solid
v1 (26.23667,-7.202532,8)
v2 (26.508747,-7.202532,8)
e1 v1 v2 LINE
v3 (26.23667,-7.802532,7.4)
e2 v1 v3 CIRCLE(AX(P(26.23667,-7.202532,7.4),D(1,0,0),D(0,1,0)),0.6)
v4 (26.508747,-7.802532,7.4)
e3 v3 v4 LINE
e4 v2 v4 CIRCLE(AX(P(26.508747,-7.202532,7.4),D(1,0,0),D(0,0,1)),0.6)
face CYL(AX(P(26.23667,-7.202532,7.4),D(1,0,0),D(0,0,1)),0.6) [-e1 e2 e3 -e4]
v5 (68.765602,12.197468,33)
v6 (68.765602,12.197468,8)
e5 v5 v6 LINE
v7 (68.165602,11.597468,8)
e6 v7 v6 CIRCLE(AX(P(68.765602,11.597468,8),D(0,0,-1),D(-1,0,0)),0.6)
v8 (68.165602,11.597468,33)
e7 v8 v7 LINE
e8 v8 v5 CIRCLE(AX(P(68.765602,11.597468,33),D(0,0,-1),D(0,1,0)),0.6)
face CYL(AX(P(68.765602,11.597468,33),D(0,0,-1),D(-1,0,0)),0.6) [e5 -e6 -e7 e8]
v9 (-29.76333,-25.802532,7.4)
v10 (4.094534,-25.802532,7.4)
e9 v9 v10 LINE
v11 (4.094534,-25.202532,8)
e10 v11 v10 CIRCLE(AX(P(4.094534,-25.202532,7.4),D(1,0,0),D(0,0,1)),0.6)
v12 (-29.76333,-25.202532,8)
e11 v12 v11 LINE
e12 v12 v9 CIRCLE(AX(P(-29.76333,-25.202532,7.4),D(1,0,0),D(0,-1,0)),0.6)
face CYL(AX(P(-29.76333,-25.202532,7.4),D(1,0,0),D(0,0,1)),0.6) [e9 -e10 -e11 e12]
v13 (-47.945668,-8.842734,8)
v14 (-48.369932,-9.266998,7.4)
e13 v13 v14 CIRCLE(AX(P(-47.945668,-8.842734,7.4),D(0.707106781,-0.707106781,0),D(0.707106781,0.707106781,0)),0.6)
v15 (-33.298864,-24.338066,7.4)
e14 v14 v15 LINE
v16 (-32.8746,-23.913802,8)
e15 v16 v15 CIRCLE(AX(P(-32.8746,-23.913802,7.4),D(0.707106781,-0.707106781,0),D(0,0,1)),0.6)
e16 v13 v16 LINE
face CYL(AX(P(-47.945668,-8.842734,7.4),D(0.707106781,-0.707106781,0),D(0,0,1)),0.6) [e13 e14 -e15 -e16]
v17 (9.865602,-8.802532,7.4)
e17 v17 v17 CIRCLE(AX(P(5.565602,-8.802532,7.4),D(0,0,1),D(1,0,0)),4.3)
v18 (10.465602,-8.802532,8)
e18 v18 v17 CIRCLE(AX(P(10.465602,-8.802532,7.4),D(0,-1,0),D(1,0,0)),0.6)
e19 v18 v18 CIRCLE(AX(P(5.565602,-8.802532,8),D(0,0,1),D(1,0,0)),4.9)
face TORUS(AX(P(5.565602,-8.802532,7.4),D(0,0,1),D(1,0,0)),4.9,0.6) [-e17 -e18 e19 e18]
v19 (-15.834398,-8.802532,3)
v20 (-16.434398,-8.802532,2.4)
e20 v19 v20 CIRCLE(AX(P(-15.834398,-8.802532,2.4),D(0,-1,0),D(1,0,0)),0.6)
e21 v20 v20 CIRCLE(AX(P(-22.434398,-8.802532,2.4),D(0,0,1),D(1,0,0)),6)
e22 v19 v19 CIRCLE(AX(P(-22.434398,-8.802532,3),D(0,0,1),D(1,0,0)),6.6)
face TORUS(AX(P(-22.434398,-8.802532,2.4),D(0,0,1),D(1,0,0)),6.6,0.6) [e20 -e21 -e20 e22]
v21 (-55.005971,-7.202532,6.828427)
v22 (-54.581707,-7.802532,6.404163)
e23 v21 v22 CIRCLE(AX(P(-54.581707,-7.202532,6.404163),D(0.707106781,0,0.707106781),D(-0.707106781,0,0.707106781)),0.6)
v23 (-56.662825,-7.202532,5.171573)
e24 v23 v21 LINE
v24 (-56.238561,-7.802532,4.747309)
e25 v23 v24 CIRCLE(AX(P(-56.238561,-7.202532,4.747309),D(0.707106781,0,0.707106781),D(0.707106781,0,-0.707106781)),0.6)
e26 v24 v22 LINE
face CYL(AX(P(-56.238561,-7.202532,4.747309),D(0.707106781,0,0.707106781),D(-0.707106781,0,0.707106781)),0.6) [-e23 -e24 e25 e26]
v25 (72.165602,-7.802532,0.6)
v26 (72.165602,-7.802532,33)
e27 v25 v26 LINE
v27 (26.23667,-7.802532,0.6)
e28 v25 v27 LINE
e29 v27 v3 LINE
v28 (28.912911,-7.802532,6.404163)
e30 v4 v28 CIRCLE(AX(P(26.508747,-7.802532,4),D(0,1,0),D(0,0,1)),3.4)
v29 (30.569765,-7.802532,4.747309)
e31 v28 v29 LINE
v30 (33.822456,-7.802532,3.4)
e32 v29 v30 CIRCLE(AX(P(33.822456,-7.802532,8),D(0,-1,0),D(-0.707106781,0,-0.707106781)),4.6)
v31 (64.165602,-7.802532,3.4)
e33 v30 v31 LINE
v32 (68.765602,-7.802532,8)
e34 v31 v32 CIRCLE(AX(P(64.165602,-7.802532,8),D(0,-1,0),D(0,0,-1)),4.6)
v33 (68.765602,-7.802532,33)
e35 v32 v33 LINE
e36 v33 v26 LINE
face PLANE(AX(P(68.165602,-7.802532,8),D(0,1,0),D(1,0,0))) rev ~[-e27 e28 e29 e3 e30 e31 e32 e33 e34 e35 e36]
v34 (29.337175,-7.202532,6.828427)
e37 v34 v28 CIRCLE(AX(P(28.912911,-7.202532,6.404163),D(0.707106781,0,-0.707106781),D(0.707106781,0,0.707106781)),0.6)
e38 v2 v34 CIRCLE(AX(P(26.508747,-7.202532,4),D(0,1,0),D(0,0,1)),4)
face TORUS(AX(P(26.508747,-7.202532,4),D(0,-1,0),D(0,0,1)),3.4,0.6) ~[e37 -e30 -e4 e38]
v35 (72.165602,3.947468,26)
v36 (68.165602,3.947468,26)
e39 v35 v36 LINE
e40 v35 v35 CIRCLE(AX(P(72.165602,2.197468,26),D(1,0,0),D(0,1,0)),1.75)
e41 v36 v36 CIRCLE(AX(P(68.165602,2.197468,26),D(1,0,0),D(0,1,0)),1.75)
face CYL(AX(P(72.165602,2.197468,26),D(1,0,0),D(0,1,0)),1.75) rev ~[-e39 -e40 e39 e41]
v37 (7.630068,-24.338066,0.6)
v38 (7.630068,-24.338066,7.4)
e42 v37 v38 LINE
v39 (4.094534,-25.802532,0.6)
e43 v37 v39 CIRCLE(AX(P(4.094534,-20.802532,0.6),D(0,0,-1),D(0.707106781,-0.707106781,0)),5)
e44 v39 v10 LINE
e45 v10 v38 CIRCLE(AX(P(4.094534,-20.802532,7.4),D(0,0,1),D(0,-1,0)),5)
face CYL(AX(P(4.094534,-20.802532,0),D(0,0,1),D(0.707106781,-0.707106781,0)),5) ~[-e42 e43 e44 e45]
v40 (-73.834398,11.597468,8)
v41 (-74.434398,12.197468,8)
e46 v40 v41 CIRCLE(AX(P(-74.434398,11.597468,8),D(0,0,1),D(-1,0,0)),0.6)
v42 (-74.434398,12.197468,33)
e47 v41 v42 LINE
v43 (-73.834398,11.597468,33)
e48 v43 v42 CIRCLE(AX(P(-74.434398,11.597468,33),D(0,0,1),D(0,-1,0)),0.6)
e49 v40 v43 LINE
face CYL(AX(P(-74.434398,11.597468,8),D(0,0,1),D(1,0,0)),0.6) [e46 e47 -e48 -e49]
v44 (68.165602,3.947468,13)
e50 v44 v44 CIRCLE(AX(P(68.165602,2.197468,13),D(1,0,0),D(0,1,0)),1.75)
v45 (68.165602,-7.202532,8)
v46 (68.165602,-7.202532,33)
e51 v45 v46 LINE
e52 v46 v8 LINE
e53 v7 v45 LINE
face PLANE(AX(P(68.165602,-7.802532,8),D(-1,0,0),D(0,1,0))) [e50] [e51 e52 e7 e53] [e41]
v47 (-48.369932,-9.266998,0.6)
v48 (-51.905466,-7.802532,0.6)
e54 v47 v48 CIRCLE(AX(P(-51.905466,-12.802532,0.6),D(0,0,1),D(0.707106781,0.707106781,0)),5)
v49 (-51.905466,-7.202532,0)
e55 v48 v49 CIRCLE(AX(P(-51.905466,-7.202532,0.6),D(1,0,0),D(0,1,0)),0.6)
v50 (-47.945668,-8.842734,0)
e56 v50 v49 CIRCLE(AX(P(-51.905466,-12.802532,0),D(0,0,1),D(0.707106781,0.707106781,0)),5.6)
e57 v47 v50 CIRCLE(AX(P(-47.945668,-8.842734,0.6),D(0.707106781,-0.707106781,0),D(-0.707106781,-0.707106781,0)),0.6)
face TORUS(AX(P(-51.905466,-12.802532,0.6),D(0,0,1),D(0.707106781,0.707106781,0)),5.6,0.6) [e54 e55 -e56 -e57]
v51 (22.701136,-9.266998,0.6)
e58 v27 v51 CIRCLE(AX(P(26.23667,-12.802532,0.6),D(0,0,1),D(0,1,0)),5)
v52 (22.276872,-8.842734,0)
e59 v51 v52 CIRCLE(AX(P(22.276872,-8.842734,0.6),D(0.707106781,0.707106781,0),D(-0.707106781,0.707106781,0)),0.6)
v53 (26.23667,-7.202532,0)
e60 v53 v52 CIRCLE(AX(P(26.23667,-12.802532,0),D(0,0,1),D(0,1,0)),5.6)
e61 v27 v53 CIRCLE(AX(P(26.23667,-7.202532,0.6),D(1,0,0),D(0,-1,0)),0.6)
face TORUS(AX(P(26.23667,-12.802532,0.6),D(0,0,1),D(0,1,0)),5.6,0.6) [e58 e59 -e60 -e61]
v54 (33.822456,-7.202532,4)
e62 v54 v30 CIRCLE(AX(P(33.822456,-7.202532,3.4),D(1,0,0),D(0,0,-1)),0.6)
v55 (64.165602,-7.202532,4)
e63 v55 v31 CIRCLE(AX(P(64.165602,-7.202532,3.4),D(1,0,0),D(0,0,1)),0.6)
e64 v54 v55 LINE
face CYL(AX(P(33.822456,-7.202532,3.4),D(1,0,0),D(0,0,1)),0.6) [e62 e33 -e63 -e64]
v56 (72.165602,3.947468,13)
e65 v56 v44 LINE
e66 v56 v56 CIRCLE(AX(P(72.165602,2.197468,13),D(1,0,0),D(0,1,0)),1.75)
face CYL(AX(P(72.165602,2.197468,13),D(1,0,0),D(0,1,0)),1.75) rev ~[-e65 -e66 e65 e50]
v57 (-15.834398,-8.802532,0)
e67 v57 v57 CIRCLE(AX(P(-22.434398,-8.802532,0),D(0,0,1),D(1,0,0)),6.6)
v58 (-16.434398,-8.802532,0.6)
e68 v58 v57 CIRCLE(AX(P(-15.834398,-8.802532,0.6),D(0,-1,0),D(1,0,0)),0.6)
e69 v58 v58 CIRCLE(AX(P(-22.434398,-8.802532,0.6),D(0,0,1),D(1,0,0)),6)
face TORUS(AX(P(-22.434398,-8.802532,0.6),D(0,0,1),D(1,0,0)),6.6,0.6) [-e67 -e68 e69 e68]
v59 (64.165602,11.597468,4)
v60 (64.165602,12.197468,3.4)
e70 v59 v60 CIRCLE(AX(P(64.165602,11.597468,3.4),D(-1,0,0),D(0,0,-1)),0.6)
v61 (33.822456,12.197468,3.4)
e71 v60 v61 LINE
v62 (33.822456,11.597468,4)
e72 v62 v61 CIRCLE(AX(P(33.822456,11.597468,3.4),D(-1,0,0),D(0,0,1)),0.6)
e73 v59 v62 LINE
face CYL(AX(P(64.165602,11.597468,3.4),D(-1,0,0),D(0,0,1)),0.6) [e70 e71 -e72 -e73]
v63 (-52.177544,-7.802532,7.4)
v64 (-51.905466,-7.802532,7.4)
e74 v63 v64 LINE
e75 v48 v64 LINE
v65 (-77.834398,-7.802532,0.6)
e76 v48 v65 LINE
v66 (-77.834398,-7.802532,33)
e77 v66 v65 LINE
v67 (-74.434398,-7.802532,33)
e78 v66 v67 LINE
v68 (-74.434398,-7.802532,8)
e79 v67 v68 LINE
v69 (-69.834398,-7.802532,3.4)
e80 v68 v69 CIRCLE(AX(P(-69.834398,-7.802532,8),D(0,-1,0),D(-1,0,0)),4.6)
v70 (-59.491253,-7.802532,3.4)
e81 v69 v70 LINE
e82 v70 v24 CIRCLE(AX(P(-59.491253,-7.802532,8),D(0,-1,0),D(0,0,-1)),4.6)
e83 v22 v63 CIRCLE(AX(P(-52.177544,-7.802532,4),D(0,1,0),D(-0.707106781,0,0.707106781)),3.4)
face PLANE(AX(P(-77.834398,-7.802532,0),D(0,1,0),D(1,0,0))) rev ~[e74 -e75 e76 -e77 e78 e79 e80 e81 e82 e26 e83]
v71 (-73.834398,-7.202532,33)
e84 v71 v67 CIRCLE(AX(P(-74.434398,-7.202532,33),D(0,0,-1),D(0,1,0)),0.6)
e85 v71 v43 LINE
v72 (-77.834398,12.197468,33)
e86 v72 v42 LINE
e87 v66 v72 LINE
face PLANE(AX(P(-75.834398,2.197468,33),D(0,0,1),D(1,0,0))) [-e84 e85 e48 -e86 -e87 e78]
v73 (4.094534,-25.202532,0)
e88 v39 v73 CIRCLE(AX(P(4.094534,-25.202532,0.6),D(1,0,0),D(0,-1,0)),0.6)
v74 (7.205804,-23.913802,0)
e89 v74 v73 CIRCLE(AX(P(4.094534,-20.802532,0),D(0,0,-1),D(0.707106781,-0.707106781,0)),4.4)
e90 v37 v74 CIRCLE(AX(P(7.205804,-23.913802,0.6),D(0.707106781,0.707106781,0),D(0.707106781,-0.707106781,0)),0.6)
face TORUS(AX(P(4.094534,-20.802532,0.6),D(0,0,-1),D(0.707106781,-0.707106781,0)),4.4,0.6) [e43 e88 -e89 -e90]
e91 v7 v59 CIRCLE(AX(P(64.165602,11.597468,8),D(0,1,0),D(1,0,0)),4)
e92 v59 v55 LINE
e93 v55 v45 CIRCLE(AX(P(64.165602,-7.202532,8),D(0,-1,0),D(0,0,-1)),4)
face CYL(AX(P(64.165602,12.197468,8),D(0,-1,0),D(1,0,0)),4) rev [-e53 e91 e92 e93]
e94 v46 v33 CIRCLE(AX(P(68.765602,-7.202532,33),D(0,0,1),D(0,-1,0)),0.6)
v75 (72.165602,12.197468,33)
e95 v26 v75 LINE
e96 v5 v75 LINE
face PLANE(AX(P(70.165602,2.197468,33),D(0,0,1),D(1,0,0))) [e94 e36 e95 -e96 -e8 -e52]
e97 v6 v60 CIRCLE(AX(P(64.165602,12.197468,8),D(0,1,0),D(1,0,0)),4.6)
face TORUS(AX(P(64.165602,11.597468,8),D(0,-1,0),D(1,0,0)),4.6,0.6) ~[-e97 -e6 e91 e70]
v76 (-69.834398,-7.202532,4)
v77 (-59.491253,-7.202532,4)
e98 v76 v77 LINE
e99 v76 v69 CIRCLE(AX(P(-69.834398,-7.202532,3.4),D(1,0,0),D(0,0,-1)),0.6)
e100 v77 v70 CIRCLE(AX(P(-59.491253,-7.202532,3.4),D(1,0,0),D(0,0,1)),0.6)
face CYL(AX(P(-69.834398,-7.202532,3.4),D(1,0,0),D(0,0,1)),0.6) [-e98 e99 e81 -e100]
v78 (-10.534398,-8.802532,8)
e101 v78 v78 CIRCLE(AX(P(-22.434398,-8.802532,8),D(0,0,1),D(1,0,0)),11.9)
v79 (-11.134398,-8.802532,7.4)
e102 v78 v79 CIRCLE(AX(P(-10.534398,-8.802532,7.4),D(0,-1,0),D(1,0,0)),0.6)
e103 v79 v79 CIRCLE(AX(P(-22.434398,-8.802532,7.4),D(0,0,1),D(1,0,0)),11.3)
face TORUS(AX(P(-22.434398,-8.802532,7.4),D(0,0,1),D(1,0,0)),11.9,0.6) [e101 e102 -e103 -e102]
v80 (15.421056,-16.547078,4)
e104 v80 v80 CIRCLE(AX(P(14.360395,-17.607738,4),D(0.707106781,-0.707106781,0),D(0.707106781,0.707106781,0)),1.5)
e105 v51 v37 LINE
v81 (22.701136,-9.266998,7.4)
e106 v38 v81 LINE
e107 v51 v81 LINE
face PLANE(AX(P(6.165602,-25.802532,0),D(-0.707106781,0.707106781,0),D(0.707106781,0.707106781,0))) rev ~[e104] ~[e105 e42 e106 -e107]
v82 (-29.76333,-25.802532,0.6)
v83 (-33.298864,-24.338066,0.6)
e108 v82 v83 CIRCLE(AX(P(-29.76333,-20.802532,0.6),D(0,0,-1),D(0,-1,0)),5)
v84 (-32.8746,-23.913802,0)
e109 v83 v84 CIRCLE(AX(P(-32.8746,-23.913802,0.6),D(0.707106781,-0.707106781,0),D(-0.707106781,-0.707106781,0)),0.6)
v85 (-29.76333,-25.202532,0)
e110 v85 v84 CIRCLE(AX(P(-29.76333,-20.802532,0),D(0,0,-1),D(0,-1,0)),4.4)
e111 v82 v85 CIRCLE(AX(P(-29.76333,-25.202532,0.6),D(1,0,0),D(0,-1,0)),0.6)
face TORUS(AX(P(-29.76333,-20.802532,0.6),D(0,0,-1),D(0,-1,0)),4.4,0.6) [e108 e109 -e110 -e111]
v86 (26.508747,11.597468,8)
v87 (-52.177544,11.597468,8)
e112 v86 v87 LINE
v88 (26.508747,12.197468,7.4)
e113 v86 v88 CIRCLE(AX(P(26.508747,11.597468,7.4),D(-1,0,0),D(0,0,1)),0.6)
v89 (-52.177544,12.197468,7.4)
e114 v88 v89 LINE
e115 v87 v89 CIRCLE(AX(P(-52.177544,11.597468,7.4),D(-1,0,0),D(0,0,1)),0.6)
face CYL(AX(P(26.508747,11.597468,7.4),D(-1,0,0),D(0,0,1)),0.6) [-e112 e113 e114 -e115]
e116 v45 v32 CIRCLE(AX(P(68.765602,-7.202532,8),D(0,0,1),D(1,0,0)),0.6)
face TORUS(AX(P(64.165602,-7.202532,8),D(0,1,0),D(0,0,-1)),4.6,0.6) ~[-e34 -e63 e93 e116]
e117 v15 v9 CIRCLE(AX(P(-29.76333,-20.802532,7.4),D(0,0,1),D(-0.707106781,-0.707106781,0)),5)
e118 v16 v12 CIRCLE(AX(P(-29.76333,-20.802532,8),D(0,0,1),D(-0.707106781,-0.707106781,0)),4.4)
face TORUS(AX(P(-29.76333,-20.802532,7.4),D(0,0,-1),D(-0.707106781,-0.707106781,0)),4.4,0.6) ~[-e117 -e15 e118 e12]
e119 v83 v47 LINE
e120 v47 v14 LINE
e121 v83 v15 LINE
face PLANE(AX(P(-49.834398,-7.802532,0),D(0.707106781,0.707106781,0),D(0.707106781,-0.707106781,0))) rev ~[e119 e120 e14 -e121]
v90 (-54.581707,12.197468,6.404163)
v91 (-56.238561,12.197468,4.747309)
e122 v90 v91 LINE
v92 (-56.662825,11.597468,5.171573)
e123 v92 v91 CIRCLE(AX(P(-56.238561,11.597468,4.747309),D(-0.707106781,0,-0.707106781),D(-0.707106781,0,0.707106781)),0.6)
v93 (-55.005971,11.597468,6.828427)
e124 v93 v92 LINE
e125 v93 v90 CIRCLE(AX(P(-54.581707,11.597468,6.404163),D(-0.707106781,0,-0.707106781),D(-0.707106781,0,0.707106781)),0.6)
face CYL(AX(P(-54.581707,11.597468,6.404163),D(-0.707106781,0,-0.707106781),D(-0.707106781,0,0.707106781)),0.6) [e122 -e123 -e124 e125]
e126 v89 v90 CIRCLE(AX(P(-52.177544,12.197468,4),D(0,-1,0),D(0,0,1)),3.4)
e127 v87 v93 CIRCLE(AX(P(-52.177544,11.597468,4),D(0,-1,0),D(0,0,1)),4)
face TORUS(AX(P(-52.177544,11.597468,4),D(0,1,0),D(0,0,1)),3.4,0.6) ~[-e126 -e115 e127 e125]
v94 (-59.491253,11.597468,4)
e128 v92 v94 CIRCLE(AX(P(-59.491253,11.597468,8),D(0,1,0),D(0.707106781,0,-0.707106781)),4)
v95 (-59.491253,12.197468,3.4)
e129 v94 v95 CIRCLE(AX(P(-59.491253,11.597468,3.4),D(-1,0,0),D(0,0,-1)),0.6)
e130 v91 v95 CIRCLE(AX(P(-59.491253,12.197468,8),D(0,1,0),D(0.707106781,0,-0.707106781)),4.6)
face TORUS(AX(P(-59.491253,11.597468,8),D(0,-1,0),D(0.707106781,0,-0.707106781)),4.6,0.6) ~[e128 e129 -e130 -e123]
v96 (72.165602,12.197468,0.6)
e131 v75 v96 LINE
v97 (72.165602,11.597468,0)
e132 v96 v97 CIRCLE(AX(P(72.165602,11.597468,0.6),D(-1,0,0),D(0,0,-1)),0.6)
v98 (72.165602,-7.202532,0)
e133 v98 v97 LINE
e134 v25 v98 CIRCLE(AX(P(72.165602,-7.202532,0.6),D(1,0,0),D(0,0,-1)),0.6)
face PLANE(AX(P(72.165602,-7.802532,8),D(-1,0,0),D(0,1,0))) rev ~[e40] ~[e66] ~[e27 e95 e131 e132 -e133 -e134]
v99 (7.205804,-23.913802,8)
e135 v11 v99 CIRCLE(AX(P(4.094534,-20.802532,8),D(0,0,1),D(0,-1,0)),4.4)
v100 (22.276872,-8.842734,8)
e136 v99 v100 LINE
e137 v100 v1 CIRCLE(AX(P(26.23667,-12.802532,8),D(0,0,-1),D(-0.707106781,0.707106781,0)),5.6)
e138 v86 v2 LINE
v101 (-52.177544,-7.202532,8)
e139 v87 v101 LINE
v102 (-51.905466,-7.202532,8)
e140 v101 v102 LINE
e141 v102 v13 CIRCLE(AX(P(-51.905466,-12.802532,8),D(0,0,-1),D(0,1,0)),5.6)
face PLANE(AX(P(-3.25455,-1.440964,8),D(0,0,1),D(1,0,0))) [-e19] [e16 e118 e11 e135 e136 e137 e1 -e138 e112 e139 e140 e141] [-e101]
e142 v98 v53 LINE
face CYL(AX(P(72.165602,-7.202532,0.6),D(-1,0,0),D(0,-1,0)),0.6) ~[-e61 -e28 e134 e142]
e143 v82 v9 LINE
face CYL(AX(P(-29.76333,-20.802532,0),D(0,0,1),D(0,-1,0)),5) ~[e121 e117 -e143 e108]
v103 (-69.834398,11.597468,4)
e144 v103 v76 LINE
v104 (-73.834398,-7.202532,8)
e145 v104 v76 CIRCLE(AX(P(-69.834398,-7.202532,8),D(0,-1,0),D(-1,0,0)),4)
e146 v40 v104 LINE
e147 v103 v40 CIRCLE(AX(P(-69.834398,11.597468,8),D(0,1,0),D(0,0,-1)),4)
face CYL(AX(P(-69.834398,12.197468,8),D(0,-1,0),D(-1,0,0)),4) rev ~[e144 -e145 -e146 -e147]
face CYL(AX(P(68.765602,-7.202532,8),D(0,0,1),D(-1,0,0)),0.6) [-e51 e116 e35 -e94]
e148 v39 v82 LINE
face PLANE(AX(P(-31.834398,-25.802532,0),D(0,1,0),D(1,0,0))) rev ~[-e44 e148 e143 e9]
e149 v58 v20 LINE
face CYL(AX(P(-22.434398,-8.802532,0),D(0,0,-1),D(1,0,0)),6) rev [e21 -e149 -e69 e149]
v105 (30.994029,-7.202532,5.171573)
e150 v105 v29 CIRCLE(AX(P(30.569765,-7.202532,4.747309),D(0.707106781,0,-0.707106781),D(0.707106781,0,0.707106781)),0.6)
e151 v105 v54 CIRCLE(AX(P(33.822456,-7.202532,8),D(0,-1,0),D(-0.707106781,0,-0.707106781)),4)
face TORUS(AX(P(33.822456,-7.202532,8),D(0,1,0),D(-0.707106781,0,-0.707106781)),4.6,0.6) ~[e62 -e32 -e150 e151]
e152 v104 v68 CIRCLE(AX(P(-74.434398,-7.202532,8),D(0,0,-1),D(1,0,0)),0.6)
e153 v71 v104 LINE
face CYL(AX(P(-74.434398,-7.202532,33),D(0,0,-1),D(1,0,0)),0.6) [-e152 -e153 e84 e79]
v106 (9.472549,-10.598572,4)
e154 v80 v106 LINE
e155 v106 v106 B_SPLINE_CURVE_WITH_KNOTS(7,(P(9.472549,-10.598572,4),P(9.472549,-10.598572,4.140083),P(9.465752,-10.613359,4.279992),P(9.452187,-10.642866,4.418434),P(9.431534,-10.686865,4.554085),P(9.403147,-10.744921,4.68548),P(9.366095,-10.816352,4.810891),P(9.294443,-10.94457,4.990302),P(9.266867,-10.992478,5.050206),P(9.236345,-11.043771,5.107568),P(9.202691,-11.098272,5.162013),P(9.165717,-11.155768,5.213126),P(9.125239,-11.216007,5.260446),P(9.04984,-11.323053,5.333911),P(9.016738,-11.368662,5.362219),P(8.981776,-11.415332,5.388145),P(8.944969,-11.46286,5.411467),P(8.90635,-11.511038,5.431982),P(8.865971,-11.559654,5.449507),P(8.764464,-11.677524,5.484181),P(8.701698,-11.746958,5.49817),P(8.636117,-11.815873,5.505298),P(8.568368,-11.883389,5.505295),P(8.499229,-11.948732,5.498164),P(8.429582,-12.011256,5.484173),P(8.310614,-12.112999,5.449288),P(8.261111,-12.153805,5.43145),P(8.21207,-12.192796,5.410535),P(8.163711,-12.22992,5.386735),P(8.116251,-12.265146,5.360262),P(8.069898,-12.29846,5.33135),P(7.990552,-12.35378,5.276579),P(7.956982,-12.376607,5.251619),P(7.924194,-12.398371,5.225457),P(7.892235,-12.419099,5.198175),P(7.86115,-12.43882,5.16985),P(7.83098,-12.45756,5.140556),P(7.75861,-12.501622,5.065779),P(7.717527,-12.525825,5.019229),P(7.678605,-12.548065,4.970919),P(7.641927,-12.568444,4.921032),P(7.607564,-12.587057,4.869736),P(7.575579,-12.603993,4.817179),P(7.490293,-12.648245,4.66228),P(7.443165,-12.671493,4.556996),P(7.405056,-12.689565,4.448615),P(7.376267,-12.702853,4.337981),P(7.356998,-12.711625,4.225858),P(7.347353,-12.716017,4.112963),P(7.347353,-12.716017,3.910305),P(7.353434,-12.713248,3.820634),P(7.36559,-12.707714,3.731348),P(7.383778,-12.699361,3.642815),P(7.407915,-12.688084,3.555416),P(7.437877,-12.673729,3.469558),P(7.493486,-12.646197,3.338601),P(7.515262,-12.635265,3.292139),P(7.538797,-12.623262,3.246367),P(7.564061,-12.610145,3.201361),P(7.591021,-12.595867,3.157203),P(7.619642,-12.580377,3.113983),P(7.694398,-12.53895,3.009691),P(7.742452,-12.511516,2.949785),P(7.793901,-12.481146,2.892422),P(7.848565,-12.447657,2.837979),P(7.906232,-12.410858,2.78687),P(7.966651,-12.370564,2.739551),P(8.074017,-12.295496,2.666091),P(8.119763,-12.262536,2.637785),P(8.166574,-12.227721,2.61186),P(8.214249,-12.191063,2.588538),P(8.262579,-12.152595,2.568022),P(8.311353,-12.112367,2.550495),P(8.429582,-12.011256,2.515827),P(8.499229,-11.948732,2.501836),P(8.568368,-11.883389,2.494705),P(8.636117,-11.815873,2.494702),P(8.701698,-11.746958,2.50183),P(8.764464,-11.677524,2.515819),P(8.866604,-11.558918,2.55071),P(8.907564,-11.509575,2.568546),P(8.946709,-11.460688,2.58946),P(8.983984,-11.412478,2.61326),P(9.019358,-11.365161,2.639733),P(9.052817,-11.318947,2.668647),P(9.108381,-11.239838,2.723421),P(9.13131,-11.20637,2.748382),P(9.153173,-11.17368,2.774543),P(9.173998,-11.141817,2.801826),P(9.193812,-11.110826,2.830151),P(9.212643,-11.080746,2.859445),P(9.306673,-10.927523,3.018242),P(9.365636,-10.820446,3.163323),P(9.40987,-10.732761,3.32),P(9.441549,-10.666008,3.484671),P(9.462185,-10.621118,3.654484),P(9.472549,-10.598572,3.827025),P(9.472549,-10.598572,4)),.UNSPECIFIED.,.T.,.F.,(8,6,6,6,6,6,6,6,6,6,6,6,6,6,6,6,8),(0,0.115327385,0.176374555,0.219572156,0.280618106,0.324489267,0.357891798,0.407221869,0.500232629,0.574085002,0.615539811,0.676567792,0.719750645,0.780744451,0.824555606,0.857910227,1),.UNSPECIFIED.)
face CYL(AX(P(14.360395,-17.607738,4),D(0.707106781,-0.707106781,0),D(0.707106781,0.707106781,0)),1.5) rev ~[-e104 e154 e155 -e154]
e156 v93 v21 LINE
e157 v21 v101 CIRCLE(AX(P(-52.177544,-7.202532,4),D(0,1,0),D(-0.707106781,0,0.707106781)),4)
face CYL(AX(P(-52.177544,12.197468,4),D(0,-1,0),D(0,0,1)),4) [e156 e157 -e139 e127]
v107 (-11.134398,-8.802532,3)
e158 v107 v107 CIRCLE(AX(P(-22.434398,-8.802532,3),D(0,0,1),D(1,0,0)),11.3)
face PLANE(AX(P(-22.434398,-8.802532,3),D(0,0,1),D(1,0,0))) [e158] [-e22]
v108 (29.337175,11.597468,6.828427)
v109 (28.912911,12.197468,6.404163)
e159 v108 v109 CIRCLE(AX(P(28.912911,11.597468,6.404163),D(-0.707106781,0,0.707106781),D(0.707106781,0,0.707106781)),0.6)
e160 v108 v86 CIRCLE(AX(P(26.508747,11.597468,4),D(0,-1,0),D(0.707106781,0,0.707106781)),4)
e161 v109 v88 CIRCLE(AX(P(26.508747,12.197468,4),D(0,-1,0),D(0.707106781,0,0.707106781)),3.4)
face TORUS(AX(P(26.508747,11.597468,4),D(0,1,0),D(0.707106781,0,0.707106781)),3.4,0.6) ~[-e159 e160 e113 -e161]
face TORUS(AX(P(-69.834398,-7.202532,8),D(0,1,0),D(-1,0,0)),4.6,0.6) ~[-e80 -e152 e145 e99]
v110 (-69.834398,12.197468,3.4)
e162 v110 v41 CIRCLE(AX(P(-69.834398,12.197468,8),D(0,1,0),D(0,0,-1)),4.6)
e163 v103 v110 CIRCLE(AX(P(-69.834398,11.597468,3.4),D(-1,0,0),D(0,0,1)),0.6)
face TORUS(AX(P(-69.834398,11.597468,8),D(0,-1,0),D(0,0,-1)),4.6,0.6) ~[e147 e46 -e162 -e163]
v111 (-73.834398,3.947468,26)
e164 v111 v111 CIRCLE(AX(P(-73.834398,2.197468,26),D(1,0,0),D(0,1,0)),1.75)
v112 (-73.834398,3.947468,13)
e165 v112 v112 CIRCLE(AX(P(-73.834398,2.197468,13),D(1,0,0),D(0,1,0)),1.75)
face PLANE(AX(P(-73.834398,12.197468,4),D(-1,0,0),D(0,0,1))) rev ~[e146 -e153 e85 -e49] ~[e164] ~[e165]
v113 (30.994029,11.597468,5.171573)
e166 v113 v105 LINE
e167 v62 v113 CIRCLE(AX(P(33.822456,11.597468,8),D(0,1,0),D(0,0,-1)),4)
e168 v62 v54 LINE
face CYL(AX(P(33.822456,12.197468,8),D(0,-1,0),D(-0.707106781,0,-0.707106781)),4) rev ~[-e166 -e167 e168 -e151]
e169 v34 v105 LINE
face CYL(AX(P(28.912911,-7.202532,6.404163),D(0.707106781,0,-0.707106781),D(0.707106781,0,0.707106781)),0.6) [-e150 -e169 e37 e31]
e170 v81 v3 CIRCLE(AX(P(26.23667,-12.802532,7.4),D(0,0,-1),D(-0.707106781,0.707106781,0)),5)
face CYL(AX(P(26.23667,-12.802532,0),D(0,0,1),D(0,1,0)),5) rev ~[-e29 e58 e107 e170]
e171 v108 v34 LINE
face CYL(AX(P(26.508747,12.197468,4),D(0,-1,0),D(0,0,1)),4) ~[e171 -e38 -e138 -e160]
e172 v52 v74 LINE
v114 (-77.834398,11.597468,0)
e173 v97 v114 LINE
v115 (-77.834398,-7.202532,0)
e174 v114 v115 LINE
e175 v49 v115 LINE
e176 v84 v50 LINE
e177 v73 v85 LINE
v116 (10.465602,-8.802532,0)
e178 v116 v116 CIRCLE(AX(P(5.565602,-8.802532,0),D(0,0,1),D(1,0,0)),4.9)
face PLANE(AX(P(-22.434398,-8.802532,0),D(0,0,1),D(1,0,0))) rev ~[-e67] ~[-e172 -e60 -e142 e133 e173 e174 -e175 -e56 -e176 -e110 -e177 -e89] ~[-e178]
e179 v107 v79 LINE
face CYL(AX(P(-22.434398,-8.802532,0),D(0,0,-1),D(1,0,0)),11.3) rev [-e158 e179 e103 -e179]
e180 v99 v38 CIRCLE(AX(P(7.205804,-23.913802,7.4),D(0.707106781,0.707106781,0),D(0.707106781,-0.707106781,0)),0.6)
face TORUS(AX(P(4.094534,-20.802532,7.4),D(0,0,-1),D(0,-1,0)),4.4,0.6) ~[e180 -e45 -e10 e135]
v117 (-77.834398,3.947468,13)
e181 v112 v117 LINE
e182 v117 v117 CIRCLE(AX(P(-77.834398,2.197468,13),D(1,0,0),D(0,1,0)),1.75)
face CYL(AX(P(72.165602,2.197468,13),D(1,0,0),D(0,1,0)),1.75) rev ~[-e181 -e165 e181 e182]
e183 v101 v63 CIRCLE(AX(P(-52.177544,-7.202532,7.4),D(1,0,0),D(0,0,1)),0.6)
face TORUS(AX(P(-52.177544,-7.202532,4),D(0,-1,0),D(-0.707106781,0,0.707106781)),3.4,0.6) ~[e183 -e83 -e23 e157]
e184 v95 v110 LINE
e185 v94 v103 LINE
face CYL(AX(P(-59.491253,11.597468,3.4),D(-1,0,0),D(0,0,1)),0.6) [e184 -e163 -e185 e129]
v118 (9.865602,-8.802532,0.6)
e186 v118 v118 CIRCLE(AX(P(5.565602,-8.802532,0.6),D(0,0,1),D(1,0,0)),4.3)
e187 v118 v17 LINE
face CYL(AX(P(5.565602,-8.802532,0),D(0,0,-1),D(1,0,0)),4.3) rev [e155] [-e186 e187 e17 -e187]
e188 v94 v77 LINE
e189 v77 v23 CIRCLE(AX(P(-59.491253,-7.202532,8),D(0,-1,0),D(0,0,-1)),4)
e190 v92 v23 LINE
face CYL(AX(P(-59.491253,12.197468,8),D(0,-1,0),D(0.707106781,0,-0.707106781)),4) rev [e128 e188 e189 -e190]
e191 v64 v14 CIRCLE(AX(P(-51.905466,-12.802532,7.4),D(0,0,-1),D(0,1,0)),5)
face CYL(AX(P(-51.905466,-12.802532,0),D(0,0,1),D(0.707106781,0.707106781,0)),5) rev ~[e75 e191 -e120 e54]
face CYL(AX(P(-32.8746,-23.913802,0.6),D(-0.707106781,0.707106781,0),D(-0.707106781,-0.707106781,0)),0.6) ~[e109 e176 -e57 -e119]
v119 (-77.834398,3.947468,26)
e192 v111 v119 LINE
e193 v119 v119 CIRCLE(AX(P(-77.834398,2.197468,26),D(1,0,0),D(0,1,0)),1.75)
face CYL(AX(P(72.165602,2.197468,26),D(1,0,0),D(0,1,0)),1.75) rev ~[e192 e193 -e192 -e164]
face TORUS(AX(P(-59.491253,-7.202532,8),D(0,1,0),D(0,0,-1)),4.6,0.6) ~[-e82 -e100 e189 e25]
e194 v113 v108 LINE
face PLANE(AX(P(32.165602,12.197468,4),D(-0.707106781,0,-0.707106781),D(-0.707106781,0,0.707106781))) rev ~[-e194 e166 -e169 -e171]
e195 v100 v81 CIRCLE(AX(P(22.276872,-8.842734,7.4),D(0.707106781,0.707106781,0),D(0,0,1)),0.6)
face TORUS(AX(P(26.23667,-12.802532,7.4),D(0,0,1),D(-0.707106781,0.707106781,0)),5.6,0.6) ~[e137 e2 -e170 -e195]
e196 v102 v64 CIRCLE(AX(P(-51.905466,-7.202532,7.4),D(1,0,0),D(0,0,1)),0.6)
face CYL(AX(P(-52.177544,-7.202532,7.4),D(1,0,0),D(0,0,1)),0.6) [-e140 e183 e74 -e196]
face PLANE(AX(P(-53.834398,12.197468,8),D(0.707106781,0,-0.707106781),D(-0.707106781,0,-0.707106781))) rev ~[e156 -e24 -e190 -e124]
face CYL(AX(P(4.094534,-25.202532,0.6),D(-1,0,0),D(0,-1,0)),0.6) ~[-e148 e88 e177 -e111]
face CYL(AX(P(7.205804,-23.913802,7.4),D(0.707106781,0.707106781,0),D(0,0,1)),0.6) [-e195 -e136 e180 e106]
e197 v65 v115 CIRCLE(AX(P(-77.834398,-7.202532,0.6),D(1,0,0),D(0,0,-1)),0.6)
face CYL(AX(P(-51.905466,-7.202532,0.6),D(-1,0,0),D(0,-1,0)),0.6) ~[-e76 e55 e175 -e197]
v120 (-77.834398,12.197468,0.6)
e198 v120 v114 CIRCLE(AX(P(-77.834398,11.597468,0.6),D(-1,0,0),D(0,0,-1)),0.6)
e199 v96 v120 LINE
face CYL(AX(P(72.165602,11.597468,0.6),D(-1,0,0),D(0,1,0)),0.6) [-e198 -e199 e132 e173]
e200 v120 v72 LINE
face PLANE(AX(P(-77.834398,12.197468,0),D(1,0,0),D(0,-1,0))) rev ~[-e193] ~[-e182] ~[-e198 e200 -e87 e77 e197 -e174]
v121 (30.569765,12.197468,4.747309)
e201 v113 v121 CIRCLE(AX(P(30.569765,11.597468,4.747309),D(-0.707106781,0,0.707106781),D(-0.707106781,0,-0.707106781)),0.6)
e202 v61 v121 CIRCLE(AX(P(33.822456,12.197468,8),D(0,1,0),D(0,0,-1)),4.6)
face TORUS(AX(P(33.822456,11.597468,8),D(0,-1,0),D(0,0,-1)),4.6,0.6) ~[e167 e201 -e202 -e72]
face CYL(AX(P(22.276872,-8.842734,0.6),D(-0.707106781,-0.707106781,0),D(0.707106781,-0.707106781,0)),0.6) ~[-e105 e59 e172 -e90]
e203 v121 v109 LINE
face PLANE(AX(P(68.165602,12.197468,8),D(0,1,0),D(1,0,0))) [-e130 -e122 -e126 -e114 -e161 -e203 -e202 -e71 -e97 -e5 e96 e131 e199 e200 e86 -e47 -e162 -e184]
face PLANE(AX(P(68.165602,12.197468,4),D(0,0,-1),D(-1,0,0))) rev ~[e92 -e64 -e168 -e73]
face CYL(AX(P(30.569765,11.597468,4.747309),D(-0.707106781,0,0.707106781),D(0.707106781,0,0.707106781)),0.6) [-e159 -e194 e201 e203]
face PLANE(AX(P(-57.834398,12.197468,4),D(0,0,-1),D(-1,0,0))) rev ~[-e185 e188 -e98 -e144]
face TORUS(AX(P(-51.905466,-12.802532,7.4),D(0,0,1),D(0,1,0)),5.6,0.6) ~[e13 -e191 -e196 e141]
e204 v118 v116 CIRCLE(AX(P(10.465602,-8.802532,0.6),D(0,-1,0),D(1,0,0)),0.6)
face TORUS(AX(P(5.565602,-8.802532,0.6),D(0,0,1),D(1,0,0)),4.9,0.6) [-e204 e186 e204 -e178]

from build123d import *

# Parameters (mm, degrees)
F0_R      = 11.3
F0_R_2    = 4.3
F1_DEPTH  = 8
F0_R_3    = 6
F2_DEPTH  = 3
F4_W      = 4
F4_H      = 20
F5_DEPTH  = 25
F7_DEPTH  = 25
F8_R      = 0.6
F9_R      = 5
F10_R     = 4
F11_R     = 1.75
F12_DEPTH = 150.001
F13_R     = 0.6
F14_R     = 1.5
F15_DEPTH = 15


with BuildPart() as f1:
    # F0 (on Top) → F1 (new body)
    with BuildSketch(Plane.XY):
        Polygon((72.1656017255, 12.1974679563), (-77.8343982745, 12.1974679563), (-77.8343982745, -7.8025320437), (-49.8343982745, -7.8025320437), (-31.8343982745, -25.8025320437), (6.1656017255, -25.8025320437), (24.1656017255, -7.8025320437), (72.1656017255, -7.8025320437), align=None)
        with Locations((-22.4343982745, -8.8025320437)):
            Circle(F0_R, mode=Mode.SUBTRACT)
        with Locations((5.5656017255, -8.8025320437)):
            Circle(F0_R_2, mode=Mode.SUBTRACT)
    extrude(amount=F1_DEPTH)

    # F0 (on Top) → F2 (join)
    with BuildSketch(Plane.XY):
        with Locations((-22.4343982745, -8.8025320437)):
            Circle(F0_R)
        with Locations((-22.4343982745, -8.8025320437)):
            Circle(F0_R_3, mode=Mode.SUBTRACT)
    extrude(amount=F2_DEPTH)

    # F4 (on face) → F5 (join)
    with BuildSketch(Plane.XY.offset(8)):
        with Locations((70.1656017255, 2.1974679563)):
            Rectangle(F4_W, F4_H)
        with Locations((-75.8343982745, 2.1974679563)):
            Rectangle(F4_W, F4_H)
    extrude(amount=F5_DEPTH)

    # F6 (on face) → F7 (cut)
    with BuildSketch(Plane(origin=(0, 12.1974679563, 0), x_dir=(-1, 0, 0), z_dir=(0, 1, 0))):
        Polygon((-28.1656017255, 8), (-68.1656017255, 8), (-68.1656017255, 4), (-32.1656017255, 4), align=None)
        Polygon((73.8343982745, 8), (53.8343982745, 8), (57.8343982745, 4), (73.8343982745, 4), align=None)
    extrude(amount=-F7_DEPTH, mode=Mode.SUBTRACT)

    # F8
    f8_edges = [f1.edges().sort_by_distance(p)[0] for p in [
        (-28.434398, -8.802532, 0),
        (1.265602, -8.802532, 0),
        (-33.734398, -8.802532, 8),
        (-28.434398, -8.802532, 3),
        (1.265602, -8.802532, 8),
    ]]
    fillet(f8_edges, radius=F8_R)

    # F9
    f9_edges = [f1.edges().sort_by_distance(p)[0] for p in [
        (-49.834398, -7.802532, 4),
        (-31.834398, -25.802532, 4),
        (6.165602, -25.802532, 4),
        (24.165602, -7.802532, 4),
    ]]
    fillet(f9_edges, radius=F9_R)

    # F10
    f10_edges = [f1.edges().sort_by_distance(p)[0] for p in [
        (68.165602, 2.197468, 4),
        (-73.834398, 2.197468, 4),
        (32.165602, 2.197468, 4),
        (28.165602, 2.197468, 8),
        (-53.834398, 2.197468, 8),
        (-57.834398, 2.197468, 4),
    ]]
    fillet(f10_edges, radius=F10_R)

    # F11 (on face) → F12 (cut, through all)
    with BuildSketch(Plane.YZ.offset(72.1656017255)):
        with Locations((2.1974679563, 26)):
            Circle(F11_R)
        with Locations((2.1974679563, 13)):
            Circle(F11_R)
    extrude(amount=-F12_DEPTH, mode=Mode.SUBTRACT)

    # F13
    f13_edges = [f1.edges().sort_by_distance(p)[0] for p in [
        (-49.992049, -8.183134, 0),
        (-12.834398, 12.197468, 8),
        (-2.834398, 12.197468, 0),
        (-52.041505, -7.802532, 8),
        (-49.992049, -8.183134, 8),
        (-40.834398, -16.802532, 8),
        (-31.676748, -25.42193, 8),
        (26.372709, -7.802532, 8),
        (-12.834398, -25.802532, 8),
        (24.323252, -8.183134, 8),
        (6.007951, -25.42193, 8),
        (15.165602, -16.802532, 8),
        (-53.708278, -7.802532, 7.695518),
        (-55.834398, -7.802532, 6),
        (-64.869932, -7.802532, 0),
        (-57.960519, -7.802532, 4.304482),
        (-64.662825, -7.802532, 4),
        (-72.662825, -7.802532, 5.171573),
        (-73.834398, -7.802532, 20.5),
        (-53.708278, 12.197468, 7.695518),
        (68.165602, 12.197468, 20.5),
        (66.994029, 12.197468, 5.171573),
        (48.994029, 12.197468, 4),
        (32.291722, 12.197468, 4.304482),
        (30.165602, 12.197468, 6),
        (28.039481, 12.197468, 7.695518),
        (-73.834398, 12.197468, 20.5),
        (-72.662825, 12.197468, 5.171573),
        (-55.834398, 12.197468, 6),
        (-64.662825, 12.197468, 4),
        (-57.960519, 12.197468, 4.304482),
        (-40.834398, -16.802532, 0),
        (28.039481, -7.802532, 7.695518),
        (-31.676748, -25.42193, 0),
        (30.165602, -7.802532, 6),
        (49.201136, -7.802532, 0),
        (32.291722, -7.802532, 4.304482),
        (48.994029, -7.802532, 4),
        (66.994029, -7.802532, 5.171573),
        (68.165602, -7.802532, 20.5),
        (-12.834398, -25.802532, 0),
        (24.323252, -8.183134, 0),
        (6.007951, -25.42193, 0),
        (15.165602, -16.802532, 0),
    ]]
    fillet(f13_edges, radius=F13_R)

    # F14 (on face) → F15 (cut)
    with BuildSketch(Plane(origin=(15.9840668846, -15.9840668846, 0), x_dir=(0.7071067812, 0.7071067812, 0), z_dir=(0.7071067812, -0.7071067812, 0))):
        with Locations((-2.2962181829, 4)):
            Circle(F14_R)
    extrude(amount=-F15_DEPTH, mode=Mode.SUBTRACT)


solid = f1.part
